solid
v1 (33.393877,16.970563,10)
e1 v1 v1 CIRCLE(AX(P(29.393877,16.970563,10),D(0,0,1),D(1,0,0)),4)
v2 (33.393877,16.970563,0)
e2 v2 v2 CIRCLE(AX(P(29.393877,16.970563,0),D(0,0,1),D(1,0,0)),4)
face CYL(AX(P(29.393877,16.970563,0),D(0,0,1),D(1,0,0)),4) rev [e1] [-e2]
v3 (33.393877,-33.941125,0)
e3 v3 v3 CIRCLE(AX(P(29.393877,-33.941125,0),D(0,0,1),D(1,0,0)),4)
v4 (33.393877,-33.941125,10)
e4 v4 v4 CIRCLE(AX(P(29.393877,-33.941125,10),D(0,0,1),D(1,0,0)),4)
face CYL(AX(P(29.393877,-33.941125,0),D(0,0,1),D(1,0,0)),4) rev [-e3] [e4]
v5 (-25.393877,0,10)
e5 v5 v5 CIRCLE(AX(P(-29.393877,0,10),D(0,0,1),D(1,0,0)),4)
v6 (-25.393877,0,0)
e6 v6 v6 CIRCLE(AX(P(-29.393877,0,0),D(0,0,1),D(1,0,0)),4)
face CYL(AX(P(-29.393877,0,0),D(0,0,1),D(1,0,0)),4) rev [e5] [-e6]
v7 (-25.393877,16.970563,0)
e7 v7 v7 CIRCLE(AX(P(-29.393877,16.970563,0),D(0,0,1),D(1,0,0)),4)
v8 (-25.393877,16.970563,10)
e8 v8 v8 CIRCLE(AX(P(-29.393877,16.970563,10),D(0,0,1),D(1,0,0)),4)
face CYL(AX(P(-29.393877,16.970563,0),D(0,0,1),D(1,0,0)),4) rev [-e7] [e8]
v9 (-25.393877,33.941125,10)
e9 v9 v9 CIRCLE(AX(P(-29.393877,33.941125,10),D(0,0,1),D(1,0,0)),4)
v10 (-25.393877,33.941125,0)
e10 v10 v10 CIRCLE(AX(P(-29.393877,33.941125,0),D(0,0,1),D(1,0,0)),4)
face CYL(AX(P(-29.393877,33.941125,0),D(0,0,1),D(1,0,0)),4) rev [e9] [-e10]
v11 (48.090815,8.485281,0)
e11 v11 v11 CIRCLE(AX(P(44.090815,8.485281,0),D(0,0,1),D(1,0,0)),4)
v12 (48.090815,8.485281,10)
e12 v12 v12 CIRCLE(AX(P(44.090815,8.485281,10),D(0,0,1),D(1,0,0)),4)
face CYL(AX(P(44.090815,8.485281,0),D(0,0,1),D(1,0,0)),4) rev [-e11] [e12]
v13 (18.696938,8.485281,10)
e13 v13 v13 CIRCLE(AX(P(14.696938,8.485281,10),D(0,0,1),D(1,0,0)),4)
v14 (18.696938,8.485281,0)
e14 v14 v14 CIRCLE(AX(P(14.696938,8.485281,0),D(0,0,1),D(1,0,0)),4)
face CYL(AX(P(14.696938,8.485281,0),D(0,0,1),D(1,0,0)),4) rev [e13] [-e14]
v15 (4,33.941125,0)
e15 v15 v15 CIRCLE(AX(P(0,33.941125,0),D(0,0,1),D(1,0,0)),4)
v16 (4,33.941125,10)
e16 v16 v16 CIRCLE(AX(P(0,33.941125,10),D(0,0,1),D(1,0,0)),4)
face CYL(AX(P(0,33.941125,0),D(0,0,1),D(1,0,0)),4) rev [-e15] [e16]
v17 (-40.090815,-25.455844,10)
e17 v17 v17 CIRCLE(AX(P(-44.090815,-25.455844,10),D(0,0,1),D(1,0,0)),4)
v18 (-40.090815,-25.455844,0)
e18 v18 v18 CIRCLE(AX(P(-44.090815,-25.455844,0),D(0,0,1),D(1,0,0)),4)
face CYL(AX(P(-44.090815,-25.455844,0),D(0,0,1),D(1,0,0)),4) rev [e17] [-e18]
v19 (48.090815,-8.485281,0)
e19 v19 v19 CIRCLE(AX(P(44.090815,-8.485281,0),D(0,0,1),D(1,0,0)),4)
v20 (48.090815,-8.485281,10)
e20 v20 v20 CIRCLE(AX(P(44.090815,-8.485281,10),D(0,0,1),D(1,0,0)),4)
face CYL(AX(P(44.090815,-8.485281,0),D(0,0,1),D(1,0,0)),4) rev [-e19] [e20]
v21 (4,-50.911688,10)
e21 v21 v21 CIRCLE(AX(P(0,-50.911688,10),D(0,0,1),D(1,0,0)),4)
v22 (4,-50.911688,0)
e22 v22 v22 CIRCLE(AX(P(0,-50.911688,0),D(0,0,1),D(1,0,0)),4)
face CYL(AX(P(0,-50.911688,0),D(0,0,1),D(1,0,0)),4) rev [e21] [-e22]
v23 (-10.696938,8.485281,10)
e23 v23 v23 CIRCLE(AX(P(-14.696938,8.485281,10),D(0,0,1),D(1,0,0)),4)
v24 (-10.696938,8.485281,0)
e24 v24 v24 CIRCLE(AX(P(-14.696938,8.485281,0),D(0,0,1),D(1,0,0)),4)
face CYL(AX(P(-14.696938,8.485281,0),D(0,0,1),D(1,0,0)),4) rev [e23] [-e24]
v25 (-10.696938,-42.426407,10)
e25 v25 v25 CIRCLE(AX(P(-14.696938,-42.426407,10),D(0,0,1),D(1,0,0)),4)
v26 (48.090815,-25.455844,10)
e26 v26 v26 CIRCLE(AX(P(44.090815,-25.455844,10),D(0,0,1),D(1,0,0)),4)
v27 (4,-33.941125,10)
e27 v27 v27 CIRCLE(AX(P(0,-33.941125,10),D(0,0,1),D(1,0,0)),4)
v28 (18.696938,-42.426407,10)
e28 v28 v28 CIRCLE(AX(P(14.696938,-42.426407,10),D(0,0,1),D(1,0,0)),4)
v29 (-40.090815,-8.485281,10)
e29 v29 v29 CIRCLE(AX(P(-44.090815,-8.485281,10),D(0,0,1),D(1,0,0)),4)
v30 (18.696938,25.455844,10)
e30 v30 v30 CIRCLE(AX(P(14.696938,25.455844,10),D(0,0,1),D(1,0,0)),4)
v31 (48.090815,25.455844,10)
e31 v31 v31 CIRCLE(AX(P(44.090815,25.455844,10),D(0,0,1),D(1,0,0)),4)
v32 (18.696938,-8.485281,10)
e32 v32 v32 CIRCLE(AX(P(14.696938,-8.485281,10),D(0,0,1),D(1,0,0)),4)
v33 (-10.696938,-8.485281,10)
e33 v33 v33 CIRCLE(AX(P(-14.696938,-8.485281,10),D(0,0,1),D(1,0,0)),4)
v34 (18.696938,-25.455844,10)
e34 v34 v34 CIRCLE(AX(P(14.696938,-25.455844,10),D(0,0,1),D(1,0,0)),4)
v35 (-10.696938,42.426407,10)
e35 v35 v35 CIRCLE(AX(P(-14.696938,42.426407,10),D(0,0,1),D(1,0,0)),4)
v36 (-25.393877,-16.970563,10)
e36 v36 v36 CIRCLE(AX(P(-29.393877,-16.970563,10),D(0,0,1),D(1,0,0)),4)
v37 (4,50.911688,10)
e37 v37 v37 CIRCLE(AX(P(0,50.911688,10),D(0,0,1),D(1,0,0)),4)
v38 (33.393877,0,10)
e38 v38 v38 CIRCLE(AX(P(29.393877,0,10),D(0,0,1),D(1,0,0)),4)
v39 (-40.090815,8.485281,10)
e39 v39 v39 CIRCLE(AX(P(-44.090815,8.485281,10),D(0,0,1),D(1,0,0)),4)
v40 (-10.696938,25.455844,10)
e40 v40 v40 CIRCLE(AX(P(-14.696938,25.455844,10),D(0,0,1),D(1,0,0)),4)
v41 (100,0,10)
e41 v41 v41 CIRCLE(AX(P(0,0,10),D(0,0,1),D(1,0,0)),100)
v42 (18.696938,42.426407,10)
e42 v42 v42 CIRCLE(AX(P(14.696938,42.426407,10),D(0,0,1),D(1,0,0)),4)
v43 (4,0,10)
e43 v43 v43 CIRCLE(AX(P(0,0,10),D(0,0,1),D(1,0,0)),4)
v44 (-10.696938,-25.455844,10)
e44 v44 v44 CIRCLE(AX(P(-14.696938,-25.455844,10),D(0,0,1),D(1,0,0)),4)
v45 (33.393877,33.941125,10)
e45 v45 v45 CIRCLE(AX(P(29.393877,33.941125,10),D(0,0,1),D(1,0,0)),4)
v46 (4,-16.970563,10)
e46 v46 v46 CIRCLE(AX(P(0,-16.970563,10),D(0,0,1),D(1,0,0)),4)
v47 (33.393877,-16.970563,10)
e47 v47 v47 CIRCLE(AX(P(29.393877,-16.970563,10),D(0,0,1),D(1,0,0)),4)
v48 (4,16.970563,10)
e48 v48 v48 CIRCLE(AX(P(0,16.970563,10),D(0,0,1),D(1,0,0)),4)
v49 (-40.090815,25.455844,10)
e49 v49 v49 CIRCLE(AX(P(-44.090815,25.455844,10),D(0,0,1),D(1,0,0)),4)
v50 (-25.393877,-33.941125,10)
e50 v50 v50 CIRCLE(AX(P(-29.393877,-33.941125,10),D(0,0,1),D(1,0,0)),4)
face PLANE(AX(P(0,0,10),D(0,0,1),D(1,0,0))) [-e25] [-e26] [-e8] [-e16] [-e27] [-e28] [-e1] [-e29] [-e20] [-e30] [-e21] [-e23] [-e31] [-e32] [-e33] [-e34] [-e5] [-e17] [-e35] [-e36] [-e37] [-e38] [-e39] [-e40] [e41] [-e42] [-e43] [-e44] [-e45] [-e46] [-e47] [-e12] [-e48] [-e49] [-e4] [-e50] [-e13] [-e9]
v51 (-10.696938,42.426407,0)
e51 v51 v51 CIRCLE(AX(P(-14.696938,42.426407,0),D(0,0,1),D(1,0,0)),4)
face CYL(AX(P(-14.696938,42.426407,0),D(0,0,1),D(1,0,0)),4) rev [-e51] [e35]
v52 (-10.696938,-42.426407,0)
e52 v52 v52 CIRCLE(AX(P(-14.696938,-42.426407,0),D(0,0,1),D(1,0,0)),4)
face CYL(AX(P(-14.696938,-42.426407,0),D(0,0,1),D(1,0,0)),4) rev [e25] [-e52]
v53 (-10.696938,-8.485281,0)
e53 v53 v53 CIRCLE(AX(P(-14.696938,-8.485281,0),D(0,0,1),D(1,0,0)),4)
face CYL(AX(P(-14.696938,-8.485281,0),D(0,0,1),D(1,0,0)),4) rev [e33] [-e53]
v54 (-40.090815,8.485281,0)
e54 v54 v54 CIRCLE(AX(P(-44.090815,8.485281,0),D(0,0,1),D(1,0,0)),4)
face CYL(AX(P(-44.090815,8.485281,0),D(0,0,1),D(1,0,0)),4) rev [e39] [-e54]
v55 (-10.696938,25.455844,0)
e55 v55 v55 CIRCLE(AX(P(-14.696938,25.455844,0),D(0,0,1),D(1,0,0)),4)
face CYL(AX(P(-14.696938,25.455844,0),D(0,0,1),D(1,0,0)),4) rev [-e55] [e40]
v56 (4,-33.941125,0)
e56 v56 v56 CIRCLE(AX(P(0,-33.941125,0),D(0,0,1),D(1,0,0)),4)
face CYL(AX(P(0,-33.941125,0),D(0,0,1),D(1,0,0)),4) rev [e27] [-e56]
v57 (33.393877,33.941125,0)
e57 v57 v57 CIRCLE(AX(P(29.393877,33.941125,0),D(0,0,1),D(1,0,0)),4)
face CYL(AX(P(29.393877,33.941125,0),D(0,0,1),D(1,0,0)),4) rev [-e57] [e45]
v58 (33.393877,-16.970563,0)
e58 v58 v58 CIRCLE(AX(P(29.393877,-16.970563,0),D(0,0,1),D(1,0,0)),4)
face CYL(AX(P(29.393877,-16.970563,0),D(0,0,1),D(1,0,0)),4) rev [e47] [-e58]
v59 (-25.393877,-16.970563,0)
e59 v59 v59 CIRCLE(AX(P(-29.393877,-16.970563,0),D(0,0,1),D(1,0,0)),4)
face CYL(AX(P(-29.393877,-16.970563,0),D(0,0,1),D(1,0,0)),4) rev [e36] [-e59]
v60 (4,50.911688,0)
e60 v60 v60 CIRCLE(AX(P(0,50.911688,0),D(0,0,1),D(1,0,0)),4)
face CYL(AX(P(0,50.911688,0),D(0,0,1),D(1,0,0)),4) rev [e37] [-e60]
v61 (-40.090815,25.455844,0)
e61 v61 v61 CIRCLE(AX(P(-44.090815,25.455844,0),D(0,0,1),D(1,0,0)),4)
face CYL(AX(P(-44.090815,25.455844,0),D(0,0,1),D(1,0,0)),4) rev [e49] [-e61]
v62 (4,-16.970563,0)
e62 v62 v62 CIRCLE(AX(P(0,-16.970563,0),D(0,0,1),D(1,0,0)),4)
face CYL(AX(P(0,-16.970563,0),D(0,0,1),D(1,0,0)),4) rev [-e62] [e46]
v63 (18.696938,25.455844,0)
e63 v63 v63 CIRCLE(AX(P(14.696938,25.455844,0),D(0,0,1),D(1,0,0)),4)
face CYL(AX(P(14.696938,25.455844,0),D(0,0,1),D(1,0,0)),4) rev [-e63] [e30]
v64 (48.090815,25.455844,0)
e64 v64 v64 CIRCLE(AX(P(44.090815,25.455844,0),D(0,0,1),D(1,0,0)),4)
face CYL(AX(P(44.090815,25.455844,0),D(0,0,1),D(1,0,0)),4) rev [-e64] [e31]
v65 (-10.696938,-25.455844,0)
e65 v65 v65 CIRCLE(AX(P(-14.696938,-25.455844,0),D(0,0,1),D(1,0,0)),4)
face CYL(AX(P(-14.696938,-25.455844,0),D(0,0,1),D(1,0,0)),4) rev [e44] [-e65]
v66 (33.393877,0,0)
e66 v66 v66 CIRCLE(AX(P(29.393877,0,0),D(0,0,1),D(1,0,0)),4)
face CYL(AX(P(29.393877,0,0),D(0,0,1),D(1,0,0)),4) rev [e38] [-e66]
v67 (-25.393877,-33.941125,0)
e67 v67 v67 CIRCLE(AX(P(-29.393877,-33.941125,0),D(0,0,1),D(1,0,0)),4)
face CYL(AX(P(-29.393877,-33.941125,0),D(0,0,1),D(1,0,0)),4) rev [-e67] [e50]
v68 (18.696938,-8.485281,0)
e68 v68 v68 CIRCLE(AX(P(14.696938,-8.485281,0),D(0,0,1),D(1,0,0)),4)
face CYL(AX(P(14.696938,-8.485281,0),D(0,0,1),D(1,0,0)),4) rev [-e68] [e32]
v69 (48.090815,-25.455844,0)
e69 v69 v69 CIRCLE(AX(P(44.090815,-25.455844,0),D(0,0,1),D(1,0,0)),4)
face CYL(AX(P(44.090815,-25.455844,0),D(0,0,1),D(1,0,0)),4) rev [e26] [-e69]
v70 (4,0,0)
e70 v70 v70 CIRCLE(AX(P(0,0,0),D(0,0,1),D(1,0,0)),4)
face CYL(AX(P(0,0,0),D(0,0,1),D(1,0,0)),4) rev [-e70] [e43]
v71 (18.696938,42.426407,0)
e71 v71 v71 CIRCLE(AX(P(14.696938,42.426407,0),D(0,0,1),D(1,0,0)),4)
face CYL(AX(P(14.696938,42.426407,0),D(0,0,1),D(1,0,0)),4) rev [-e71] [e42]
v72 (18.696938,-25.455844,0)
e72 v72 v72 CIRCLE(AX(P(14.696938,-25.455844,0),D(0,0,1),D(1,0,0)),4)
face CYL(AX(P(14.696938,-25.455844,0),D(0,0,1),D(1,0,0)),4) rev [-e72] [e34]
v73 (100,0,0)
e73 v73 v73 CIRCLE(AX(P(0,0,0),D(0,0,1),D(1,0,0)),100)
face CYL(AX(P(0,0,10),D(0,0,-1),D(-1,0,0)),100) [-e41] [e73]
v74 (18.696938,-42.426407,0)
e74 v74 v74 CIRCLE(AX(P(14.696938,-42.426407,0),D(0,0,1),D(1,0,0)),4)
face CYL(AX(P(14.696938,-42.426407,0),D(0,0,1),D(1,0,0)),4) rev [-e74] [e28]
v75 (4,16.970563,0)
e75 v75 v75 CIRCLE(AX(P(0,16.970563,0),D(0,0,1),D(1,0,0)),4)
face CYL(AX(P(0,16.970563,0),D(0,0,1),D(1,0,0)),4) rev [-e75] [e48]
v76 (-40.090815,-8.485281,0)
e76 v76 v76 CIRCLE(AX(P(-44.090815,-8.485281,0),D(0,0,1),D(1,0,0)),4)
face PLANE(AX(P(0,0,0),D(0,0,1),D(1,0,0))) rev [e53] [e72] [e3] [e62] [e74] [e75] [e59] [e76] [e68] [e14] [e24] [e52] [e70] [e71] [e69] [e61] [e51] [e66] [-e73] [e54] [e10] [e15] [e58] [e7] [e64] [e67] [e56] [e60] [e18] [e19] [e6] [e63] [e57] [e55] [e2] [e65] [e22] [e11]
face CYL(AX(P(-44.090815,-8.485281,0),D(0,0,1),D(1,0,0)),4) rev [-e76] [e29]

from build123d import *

# Parameters (mm, degrees)
SKETCH1_R               = 100
BOSS_EXTRUDE1_DEPTH     = 10
FILL_PATTERN1_OUTLINE_R = 4
FILL_PATTERN1_DEPTH     = 10


# Read off the part's stored shape, not the designer's step: Fill Pattern1
with BuildPart() as part:
    # Sketch1 → Boss-Extrude1 (new body)
    with BuildSketch(Plane.XY):
        Circle(SKETCH1_R)
    extrude(amount=BOSS_EXTRUDE1_DEPTH)

    # Fill Pattern1 outline → Fill Pattern1 (cut)
    with BuildSketch(Plane.XY):
        with Locations((-44.09081537, 25.455844123)):
            Circle(FILL_PATTERN1_OUTLINE_R)
        with Locations((0, 50.911688245)):
            Circle(FILL_PATTERN1_OUTLINE_R)
        with Locations((-14.696938457, 42.426406871)):
            Circle(FILL_PATTERN1_OUTLINE_R)
        with Locations((-29.393876913, 33.941125497)):
            Circle(FILL_PATTERN1_OUTLINE_R)
        with Locations((-29.393876913, 16.970562748)):
            Circle(FILL_PATTERN1_OUTLINE_R)
        with Locations((-44.09081537, 8.485281374)):
            Circle(FILL_PATTERN1_OUTLINE_R)
        with Locations((-44.09081537, -8.485281374)):
            Circle(FILL_PATTERN1_OUTLINE_R)
        with Locations((-44.09081537, -25.455844123)):
            Circle(FILL_PATTERN1_OUTLINE_R)
        with Locations((14.696938457, 42.426406871)):
            Circle(FILL_PATTERN1_OUTLINE_R)
        with Locations((0, 33.941125497)):
            Circle(FILL_PATTERN1_OUTLINE_R)
        with Locations((-14.696938457, 25.455844123)):
            Circle(FILL_PATTERN1_OUTLINE_R)
        with Locations((-14.696938457, 8.485281374)):
            Circle(FILL_PATTERN1_OUTLINE_R)
        with Locations((-29.393876913, 0)):
            Circle(FILL_PATTERN1_OUTLINE_R)
        with Locations((-29.393876913, -16.970562748)):
            Circle(FILL_PATTERN1_OUTLINE_R)
        with Locations((-29.393876913, -33.941125497)):
            Circle(FILL_PATTERN1_OUTLINE_R)
        with Locations((29.393876913, 33.941125497)):
            Circle(FILL_PATTERN1_OUTLINE_R)
        with Locations((14.696938457, 25.455844123)):
            Circle(FILL_PATTERN1_OUTLINE_R)
        with Locations((0, 16.970562748)):
            Circle(FILL_PATTERN1_OUTLINE_R)
        Circle(FILL_PATTERN1_OUTLINE_R)
        with Locations((-14.696938457, -8.485281374)):
            Circle(FILL_PATTERN1_OUTLINE_R)
        with Locations((-14.696938457, -25.455844123)):
            Circle(FILL_PATTERN1_OUTLINE_R)
        with Locations((-14.696938457, -42.426406871)):
            Circle(FILL_PATTERN1_OUTLINE_R)
        with Locations((44.09081537, 25.455844123)):
            Circle(FILL_PATTERN1_OUTLINE_R)
        with Locations((29.393876913, 16.970562748)):
            Circle(FILL_PATTERN1_OUTLINE_R)
        with Locations((14.696938457, 8.485281374)):
            Circle(FILL_PATTERN1_OUTLINE_R)
        with Locations((14.696938457, -8.485281374)):
            Circle(FILL_PATTERN1_OUTLINE_R)
        with Locations((0, -16.970562748)):
            Circle(FILL_PATTERN1_OUTLINE_R)
        with Locations((0, -33.941125497)):
            Circle(FILL_PATTERN1_OUTLINE_R)
        with Locations((0, -50.911688245)):
            Circle(FILL_PATTERN1_OUTLINE_R)
        with Locations((44.09081537, 8.485281374)):
            Circle(FILL_PATTERN1_OUTLINE_R)
        with Locations((29.393876913, 0)):
            Circle(FILL_PATTERN1_OUTLINE_R)
        with Locations((29.393876913, -16.970562748)):
            Circle(FILL_PATTERN1_OUTLINE_R)
        with Locations((14.696938457, -25.455844123)):
            Circle(FILL_PATTERN1_OUTLINE_R)
        with Locations((14.696938457, -42.426406871)):
            Circle(FILL_PATTERN1_OUTLINE_R)
        with Locations((44.09081537, -8.485281374)):
            Circle(FILL_PATTERN1_OUTLINE_R)
        with Locations((44.09081537, -25.455844123)):
            Circle(FILL_PATTERN1_OUTLINE_R)
        with Locations((29.393876913, -33.941125497)):
            Circle(FILL_PATTERN1_OUTLINE_R)
    extrude(amount=FILL_PATTERN1_DEPTH, mode=Mode.SUBTRACT)


solid = part.part
